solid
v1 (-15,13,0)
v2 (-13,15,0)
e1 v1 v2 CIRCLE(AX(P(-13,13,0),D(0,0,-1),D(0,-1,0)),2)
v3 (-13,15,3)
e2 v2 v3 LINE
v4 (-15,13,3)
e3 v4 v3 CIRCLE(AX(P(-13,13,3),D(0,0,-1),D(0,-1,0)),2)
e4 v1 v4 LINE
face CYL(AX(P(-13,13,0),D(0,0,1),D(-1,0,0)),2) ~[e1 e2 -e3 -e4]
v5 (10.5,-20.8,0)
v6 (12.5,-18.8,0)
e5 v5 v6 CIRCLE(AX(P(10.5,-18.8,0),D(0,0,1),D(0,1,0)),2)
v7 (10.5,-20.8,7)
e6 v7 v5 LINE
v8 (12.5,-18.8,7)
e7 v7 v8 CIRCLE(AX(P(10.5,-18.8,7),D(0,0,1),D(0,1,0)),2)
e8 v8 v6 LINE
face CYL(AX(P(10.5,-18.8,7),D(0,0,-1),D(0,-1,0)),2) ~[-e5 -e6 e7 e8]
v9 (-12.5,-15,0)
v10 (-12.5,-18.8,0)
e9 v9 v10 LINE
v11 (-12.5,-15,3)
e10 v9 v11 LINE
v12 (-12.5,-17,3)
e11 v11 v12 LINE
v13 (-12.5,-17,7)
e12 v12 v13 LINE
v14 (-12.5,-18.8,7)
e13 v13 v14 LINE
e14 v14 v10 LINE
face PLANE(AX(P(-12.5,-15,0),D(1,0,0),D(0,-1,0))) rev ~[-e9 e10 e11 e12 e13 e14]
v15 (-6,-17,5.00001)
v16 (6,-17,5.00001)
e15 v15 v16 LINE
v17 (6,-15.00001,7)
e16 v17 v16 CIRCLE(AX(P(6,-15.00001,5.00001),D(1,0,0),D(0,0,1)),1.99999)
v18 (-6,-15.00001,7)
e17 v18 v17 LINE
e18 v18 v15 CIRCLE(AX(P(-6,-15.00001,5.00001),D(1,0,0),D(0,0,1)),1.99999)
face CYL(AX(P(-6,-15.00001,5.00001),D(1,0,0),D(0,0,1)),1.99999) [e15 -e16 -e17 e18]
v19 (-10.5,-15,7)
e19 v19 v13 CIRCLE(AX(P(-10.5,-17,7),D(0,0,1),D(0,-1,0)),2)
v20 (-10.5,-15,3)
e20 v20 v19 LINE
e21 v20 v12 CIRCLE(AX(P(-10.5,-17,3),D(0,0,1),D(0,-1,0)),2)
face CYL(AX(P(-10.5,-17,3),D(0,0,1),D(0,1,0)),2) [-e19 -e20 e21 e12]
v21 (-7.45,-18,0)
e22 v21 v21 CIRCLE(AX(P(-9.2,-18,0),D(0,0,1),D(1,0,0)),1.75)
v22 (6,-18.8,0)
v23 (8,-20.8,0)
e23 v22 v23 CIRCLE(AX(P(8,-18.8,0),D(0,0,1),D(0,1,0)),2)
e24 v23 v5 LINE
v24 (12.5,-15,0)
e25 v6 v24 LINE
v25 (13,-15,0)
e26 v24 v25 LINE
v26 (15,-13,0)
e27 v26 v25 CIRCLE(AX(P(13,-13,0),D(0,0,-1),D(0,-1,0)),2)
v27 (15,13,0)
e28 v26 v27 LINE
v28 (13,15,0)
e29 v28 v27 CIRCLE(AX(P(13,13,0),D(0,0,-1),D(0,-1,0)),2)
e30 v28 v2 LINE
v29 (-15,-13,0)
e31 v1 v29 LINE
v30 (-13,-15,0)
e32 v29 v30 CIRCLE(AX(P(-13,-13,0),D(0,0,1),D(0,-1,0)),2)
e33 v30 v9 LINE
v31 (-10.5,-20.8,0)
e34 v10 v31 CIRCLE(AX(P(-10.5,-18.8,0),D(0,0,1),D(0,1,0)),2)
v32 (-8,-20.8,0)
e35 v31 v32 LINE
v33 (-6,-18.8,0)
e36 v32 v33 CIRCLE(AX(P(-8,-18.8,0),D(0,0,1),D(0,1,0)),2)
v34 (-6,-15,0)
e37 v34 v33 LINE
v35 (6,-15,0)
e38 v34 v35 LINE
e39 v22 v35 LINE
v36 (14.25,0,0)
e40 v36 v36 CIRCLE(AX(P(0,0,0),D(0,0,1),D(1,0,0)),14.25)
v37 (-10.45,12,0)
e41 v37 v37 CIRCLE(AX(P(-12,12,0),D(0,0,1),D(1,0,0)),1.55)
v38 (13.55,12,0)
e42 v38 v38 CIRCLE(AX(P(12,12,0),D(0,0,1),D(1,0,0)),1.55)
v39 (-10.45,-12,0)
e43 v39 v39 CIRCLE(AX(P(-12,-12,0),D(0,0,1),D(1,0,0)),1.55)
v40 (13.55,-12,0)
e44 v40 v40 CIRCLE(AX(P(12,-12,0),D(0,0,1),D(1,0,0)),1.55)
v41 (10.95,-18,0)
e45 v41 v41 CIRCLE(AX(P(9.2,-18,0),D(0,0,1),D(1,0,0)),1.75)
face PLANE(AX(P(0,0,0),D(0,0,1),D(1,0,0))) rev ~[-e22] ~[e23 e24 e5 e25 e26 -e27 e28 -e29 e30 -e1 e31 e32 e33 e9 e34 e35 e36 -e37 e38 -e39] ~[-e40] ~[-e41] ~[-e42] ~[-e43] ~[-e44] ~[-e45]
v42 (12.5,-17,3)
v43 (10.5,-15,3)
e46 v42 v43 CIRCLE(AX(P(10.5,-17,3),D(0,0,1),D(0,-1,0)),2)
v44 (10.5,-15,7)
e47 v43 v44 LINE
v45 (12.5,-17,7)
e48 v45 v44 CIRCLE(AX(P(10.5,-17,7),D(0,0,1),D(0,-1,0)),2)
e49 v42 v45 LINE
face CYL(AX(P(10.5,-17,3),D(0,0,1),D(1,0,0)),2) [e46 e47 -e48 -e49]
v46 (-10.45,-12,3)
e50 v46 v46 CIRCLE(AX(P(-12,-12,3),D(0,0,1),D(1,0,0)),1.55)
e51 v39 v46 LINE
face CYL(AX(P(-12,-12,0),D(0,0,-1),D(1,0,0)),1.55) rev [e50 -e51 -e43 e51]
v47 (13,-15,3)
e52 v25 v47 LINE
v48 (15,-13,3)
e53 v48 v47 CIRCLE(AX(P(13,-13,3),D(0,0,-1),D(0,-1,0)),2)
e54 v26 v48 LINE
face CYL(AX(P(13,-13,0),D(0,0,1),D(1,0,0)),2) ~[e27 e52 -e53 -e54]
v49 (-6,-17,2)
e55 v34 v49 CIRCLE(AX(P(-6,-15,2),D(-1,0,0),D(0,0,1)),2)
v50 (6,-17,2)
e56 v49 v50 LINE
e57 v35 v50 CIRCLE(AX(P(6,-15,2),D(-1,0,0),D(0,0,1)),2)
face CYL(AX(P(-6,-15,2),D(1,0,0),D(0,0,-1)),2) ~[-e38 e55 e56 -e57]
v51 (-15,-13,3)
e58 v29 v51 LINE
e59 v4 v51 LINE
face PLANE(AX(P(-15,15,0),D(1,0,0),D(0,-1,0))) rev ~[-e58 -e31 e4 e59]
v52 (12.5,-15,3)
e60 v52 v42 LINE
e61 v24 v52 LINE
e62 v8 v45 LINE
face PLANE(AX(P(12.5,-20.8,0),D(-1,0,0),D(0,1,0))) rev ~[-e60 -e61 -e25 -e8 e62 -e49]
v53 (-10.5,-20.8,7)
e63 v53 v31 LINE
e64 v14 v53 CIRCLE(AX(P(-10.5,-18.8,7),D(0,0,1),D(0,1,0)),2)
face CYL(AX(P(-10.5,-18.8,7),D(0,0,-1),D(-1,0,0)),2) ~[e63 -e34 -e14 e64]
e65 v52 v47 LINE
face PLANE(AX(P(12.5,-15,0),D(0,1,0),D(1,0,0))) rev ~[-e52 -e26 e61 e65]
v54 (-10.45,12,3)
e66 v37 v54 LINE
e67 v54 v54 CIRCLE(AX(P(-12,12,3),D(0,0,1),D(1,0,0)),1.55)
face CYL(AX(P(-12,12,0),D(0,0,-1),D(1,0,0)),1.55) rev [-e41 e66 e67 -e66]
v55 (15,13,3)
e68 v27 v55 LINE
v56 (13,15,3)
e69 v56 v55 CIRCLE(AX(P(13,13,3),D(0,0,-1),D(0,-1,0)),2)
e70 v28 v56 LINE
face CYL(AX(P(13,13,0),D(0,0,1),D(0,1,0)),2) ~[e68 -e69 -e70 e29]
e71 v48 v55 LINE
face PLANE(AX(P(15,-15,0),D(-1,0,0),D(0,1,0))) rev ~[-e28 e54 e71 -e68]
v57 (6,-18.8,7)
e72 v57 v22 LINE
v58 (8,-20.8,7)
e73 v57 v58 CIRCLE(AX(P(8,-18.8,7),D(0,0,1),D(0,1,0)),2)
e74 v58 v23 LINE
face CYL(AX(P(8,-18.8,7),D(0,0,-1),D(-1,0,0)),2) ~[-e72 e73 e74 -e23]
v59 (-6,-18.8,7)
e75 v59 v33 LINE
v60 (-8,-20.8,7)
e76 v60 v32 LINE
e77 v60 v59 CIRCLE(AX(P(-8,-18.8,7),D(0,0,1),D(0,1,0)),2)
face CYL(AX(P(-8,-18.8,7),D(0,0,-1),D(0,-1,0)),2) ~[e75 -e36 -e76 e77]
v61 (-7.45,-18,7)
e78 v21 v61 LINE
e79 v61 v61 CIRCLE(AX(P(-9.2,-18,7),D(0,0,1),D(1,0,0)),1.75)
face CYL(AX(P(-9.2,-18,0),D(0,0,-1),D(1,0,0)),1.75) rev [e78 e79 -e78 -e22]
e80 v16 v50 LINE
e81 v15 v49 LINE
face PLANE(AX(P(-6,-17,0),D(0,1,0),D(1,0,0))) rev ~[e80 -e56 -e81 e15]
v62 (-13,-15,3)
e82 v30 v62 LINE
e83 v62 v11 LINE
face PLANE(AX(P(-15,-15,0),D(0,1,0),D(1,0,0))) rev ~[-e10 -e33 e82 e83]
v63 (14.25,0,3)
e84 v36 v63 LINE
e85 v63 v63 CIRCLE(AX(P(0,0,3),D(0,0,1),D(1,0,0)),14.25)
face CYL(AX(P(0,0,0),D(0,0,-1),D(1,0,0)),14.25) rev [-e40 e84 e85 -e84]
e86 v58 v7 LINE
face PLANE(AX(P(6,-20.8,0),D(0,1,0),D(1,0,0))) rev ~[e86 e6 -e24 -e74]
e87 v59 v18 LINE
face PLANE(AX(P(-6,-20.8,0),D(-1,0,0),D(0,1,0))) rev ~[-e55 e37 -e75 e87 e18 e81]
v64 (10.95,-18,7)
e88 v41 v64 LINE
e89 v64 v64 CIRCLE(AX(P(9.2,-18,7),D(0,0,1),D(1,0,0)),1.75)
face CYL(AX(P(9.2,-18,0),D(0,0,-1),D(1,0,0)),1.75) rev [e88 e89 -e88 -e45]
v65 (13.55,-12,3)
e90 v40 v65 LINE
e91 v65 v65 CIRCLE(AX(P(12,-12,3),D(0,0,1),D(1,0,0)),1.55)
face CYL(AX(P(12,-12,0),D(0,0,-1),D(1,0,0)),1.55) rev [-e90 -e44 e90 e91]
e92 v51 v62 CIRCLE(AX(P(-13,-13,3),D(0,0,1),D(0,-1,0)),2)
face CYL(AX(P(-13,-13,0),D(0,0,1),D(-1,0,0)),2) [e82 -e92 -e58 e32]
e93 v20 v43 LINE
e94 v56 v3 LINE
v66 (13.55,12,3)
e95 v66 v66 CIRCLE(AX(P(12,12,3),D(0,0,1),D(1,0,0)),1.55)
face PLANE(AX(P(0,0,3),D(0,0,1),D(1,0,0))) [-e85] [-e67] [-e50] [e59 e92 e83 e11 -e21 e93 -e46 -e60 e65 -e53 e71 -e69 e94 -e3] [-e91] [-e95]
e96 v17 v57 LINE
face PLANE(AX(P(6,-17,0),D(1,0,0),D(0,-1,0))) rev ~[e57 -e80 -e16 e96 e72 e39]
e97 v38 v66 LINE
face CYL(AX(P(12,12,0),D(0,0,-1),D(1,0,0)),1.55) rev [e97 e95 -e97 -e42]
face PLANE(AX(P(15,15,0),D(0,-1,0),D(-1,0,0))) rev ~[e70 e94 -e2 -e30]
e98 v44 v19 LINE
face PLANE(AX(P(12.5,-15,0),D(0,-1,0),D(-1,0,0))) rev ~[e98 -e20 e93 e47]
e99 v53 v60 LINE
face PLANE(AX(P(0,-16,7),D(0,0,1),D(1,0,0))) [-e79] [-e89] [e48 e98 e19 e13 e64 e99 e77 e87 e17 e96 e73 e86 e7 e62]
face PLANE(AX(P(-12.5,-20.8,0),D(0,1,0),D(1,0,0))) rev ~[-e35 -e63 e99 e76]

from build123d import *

# Parameters (mm, degrees)
F0_R     = 1.55
F0_R_2   = 14.25
F0_R_3   = 1.75
F0_W     = 12
F0_H     = 2
F1_DEPTH = 3
F2_DEPTH = 7
F3_R     = 2
F3_R_2   = 1.99999


# Not quite as in the source:
# - a fillet or chamfer is up to 0.001 mm smaller than in the source, because OpenCascade refuses the exact size


with BuildPart() as f1:
    # F0 (on Top) → F1 (new body)
    with BuildSketch(Plane.XY):
        Polygon((12.5, -15), (15, -15), (15, 15), (-15, 15), (-15, -15), (-12.5, -15), (-6, -15), (6, -15), align=None)
        with Locations((-12, -12)):
            Circle(F0_R, mode=Mode.SUBTRACT)
        with Locations((12, -12)):
            Circle(F0_R, mode=Mode.SUBTRACT)
        with Locations((-12, 12)):
            Circle(F0_R, mode=Mode.SUBTRACT)
        Circle(F0_R_2, mode=Mode.SUBTRACT)
        with Locations((12, 12)):
            Circle(F0_R, mode=Mode.SUBTRACT)
        Polygon((-6, -17), (-6, -15), (-12.5, -15), (-12.5, -20.8), (-6, -20.8), align=None)
        with Locations((-9.2, -18)):
            Circle(F0_R_3, mode=Mode.SUBTRACT)
        with Locations((0, -16)):
            Rectangle(F0_W, F0_H)
        Polygon((12.5, -20.8), (12.5, -15), (6, -15), (6, -17), (6, -20.8), align=None)
        with Locations((9.2, -18)):
            Circle(F0_R_3, mode=Mode.SUBTRACT)
    extrude(amount=F1_DEPTH)

    # F0 (on Top) → F2 (join)
    with BuildSketch(Plane.XY):
        with Locations((0, -16)):
            Rectangle(F0_W, F0_H)
        Polygon((-6, -17), (-6, -15), (-12.5, -15), (-12.5, -20.8), (-6, -20.8), align=None)
        with Locations((-9.2, -18)):
            Circle(F0_R_3, mode=Mode.SUBTRACT)
        Polygon((12.5, -20.8), (12.5, -15), (6, -15), (6, -17), (6, -20.8), align=None)
        with Locations((9.2, -18)):
            Circle(F0_R_3, mode=Mode.SUBTRACT)
    extrude(amount=F2_DEPTH)

    # F3 (call 1 of 12: OpenCascade refuses the feature's edges together)
    f3_edges = [f1.edges().sort_by_distance(p)[0] for p in [
        (15, -15, 1.5),
    ]]
    fillet(f3_edges, radius=F3_R)

    # F3#2 (call 2 of 12)
    f3_2_edges = [f1.edges().sort_by_distance(p)[0] for p in [
        (-15, -15, 1.5),
    ]]
    fillet(f3_2_edges, radius=F3_R)

    # F3#3 (call 3 of 12)
    f3_3_edges = [f1.edges().sort_by_distance(p)[0] for p in [
        (-15, 15, 1.5),
    ]]
    fillet(f3_3_edges, radius=F3_R)

    # F3#4 (call 4 of 12)
    f3_4_edges = [f1.edges().sort_by_distance(p)[0] for p in [
        (15, 15, 1.5),
    ]]
    fillet(f3_4_edges, radius=F3_R)

    # F3#5 (call 5 of 12)
    f3_5_edges = [f1.edges().sort_by_distance(p)[0] for p in [
        (-12.5, -20.8, 3.5),
    ]]
    fillet(f3_5_edges, radius=F3_R)

    # F3#6 (call 6 of 12)
    f3_6_edges = [f1.edges().sort_by_distance(p)[0] for p in [
        (-6, -20.8, 3.5),
    ]]
    fillet(f3_6_edges, radius=F3_R)

    # F3#7 (call 7 of 12)
    f3_7_edges = [f1.edges().sort_by_distance(p)[0] for p in [
        (6, -20.8, 3.5),
    ]]
    fillet(f3_7_edges, radius=F3_R)

    # F3#8 (call 8 of 12)
    f3_8_edges = [f1.edges().sort_by_distance(p)[0] for p in [
        (12.5, -20.8, 3.5),
    ]]
    fillet(f3_8_edges, radius=F3_R)

    # F3#9 (call 9 of 12)
    f3_9_edges = [f1.edges().sort_by_distance(p)[0] for p in [
        (12.5, -15, 5),
    ]]
    fillet(f3_9_edges, radius=F3_R)

    # F3#10 (call 10 of 12)
    f3_10_edges = [f1.edges().sort_by_distance(p)[0] for p in [
        (-12.5, -15, 5),
    ]]
    fillet(f3_10_edges, radius=F3_R)

    # F3#11 (call 11 of 12) (radius 2 in the source; OpenCascade refuses exactly that, so slightly less here)
    f3_11_edges = [f1.edges().sort_by_distance(p)[0] for p in [
        (0, -17, 7),
    ]]
    fillet(f3_11_edges, radius=F3_R_2)

    # F3#12 (call 12 of 12)
    f3_12_edges = [f1.edges().sort_by_distance(p)[0] for p in [
        (0, -17, 0),
    ]]
    fillet(f3_12_edges, radius=F3_R)


solid = f1.part
